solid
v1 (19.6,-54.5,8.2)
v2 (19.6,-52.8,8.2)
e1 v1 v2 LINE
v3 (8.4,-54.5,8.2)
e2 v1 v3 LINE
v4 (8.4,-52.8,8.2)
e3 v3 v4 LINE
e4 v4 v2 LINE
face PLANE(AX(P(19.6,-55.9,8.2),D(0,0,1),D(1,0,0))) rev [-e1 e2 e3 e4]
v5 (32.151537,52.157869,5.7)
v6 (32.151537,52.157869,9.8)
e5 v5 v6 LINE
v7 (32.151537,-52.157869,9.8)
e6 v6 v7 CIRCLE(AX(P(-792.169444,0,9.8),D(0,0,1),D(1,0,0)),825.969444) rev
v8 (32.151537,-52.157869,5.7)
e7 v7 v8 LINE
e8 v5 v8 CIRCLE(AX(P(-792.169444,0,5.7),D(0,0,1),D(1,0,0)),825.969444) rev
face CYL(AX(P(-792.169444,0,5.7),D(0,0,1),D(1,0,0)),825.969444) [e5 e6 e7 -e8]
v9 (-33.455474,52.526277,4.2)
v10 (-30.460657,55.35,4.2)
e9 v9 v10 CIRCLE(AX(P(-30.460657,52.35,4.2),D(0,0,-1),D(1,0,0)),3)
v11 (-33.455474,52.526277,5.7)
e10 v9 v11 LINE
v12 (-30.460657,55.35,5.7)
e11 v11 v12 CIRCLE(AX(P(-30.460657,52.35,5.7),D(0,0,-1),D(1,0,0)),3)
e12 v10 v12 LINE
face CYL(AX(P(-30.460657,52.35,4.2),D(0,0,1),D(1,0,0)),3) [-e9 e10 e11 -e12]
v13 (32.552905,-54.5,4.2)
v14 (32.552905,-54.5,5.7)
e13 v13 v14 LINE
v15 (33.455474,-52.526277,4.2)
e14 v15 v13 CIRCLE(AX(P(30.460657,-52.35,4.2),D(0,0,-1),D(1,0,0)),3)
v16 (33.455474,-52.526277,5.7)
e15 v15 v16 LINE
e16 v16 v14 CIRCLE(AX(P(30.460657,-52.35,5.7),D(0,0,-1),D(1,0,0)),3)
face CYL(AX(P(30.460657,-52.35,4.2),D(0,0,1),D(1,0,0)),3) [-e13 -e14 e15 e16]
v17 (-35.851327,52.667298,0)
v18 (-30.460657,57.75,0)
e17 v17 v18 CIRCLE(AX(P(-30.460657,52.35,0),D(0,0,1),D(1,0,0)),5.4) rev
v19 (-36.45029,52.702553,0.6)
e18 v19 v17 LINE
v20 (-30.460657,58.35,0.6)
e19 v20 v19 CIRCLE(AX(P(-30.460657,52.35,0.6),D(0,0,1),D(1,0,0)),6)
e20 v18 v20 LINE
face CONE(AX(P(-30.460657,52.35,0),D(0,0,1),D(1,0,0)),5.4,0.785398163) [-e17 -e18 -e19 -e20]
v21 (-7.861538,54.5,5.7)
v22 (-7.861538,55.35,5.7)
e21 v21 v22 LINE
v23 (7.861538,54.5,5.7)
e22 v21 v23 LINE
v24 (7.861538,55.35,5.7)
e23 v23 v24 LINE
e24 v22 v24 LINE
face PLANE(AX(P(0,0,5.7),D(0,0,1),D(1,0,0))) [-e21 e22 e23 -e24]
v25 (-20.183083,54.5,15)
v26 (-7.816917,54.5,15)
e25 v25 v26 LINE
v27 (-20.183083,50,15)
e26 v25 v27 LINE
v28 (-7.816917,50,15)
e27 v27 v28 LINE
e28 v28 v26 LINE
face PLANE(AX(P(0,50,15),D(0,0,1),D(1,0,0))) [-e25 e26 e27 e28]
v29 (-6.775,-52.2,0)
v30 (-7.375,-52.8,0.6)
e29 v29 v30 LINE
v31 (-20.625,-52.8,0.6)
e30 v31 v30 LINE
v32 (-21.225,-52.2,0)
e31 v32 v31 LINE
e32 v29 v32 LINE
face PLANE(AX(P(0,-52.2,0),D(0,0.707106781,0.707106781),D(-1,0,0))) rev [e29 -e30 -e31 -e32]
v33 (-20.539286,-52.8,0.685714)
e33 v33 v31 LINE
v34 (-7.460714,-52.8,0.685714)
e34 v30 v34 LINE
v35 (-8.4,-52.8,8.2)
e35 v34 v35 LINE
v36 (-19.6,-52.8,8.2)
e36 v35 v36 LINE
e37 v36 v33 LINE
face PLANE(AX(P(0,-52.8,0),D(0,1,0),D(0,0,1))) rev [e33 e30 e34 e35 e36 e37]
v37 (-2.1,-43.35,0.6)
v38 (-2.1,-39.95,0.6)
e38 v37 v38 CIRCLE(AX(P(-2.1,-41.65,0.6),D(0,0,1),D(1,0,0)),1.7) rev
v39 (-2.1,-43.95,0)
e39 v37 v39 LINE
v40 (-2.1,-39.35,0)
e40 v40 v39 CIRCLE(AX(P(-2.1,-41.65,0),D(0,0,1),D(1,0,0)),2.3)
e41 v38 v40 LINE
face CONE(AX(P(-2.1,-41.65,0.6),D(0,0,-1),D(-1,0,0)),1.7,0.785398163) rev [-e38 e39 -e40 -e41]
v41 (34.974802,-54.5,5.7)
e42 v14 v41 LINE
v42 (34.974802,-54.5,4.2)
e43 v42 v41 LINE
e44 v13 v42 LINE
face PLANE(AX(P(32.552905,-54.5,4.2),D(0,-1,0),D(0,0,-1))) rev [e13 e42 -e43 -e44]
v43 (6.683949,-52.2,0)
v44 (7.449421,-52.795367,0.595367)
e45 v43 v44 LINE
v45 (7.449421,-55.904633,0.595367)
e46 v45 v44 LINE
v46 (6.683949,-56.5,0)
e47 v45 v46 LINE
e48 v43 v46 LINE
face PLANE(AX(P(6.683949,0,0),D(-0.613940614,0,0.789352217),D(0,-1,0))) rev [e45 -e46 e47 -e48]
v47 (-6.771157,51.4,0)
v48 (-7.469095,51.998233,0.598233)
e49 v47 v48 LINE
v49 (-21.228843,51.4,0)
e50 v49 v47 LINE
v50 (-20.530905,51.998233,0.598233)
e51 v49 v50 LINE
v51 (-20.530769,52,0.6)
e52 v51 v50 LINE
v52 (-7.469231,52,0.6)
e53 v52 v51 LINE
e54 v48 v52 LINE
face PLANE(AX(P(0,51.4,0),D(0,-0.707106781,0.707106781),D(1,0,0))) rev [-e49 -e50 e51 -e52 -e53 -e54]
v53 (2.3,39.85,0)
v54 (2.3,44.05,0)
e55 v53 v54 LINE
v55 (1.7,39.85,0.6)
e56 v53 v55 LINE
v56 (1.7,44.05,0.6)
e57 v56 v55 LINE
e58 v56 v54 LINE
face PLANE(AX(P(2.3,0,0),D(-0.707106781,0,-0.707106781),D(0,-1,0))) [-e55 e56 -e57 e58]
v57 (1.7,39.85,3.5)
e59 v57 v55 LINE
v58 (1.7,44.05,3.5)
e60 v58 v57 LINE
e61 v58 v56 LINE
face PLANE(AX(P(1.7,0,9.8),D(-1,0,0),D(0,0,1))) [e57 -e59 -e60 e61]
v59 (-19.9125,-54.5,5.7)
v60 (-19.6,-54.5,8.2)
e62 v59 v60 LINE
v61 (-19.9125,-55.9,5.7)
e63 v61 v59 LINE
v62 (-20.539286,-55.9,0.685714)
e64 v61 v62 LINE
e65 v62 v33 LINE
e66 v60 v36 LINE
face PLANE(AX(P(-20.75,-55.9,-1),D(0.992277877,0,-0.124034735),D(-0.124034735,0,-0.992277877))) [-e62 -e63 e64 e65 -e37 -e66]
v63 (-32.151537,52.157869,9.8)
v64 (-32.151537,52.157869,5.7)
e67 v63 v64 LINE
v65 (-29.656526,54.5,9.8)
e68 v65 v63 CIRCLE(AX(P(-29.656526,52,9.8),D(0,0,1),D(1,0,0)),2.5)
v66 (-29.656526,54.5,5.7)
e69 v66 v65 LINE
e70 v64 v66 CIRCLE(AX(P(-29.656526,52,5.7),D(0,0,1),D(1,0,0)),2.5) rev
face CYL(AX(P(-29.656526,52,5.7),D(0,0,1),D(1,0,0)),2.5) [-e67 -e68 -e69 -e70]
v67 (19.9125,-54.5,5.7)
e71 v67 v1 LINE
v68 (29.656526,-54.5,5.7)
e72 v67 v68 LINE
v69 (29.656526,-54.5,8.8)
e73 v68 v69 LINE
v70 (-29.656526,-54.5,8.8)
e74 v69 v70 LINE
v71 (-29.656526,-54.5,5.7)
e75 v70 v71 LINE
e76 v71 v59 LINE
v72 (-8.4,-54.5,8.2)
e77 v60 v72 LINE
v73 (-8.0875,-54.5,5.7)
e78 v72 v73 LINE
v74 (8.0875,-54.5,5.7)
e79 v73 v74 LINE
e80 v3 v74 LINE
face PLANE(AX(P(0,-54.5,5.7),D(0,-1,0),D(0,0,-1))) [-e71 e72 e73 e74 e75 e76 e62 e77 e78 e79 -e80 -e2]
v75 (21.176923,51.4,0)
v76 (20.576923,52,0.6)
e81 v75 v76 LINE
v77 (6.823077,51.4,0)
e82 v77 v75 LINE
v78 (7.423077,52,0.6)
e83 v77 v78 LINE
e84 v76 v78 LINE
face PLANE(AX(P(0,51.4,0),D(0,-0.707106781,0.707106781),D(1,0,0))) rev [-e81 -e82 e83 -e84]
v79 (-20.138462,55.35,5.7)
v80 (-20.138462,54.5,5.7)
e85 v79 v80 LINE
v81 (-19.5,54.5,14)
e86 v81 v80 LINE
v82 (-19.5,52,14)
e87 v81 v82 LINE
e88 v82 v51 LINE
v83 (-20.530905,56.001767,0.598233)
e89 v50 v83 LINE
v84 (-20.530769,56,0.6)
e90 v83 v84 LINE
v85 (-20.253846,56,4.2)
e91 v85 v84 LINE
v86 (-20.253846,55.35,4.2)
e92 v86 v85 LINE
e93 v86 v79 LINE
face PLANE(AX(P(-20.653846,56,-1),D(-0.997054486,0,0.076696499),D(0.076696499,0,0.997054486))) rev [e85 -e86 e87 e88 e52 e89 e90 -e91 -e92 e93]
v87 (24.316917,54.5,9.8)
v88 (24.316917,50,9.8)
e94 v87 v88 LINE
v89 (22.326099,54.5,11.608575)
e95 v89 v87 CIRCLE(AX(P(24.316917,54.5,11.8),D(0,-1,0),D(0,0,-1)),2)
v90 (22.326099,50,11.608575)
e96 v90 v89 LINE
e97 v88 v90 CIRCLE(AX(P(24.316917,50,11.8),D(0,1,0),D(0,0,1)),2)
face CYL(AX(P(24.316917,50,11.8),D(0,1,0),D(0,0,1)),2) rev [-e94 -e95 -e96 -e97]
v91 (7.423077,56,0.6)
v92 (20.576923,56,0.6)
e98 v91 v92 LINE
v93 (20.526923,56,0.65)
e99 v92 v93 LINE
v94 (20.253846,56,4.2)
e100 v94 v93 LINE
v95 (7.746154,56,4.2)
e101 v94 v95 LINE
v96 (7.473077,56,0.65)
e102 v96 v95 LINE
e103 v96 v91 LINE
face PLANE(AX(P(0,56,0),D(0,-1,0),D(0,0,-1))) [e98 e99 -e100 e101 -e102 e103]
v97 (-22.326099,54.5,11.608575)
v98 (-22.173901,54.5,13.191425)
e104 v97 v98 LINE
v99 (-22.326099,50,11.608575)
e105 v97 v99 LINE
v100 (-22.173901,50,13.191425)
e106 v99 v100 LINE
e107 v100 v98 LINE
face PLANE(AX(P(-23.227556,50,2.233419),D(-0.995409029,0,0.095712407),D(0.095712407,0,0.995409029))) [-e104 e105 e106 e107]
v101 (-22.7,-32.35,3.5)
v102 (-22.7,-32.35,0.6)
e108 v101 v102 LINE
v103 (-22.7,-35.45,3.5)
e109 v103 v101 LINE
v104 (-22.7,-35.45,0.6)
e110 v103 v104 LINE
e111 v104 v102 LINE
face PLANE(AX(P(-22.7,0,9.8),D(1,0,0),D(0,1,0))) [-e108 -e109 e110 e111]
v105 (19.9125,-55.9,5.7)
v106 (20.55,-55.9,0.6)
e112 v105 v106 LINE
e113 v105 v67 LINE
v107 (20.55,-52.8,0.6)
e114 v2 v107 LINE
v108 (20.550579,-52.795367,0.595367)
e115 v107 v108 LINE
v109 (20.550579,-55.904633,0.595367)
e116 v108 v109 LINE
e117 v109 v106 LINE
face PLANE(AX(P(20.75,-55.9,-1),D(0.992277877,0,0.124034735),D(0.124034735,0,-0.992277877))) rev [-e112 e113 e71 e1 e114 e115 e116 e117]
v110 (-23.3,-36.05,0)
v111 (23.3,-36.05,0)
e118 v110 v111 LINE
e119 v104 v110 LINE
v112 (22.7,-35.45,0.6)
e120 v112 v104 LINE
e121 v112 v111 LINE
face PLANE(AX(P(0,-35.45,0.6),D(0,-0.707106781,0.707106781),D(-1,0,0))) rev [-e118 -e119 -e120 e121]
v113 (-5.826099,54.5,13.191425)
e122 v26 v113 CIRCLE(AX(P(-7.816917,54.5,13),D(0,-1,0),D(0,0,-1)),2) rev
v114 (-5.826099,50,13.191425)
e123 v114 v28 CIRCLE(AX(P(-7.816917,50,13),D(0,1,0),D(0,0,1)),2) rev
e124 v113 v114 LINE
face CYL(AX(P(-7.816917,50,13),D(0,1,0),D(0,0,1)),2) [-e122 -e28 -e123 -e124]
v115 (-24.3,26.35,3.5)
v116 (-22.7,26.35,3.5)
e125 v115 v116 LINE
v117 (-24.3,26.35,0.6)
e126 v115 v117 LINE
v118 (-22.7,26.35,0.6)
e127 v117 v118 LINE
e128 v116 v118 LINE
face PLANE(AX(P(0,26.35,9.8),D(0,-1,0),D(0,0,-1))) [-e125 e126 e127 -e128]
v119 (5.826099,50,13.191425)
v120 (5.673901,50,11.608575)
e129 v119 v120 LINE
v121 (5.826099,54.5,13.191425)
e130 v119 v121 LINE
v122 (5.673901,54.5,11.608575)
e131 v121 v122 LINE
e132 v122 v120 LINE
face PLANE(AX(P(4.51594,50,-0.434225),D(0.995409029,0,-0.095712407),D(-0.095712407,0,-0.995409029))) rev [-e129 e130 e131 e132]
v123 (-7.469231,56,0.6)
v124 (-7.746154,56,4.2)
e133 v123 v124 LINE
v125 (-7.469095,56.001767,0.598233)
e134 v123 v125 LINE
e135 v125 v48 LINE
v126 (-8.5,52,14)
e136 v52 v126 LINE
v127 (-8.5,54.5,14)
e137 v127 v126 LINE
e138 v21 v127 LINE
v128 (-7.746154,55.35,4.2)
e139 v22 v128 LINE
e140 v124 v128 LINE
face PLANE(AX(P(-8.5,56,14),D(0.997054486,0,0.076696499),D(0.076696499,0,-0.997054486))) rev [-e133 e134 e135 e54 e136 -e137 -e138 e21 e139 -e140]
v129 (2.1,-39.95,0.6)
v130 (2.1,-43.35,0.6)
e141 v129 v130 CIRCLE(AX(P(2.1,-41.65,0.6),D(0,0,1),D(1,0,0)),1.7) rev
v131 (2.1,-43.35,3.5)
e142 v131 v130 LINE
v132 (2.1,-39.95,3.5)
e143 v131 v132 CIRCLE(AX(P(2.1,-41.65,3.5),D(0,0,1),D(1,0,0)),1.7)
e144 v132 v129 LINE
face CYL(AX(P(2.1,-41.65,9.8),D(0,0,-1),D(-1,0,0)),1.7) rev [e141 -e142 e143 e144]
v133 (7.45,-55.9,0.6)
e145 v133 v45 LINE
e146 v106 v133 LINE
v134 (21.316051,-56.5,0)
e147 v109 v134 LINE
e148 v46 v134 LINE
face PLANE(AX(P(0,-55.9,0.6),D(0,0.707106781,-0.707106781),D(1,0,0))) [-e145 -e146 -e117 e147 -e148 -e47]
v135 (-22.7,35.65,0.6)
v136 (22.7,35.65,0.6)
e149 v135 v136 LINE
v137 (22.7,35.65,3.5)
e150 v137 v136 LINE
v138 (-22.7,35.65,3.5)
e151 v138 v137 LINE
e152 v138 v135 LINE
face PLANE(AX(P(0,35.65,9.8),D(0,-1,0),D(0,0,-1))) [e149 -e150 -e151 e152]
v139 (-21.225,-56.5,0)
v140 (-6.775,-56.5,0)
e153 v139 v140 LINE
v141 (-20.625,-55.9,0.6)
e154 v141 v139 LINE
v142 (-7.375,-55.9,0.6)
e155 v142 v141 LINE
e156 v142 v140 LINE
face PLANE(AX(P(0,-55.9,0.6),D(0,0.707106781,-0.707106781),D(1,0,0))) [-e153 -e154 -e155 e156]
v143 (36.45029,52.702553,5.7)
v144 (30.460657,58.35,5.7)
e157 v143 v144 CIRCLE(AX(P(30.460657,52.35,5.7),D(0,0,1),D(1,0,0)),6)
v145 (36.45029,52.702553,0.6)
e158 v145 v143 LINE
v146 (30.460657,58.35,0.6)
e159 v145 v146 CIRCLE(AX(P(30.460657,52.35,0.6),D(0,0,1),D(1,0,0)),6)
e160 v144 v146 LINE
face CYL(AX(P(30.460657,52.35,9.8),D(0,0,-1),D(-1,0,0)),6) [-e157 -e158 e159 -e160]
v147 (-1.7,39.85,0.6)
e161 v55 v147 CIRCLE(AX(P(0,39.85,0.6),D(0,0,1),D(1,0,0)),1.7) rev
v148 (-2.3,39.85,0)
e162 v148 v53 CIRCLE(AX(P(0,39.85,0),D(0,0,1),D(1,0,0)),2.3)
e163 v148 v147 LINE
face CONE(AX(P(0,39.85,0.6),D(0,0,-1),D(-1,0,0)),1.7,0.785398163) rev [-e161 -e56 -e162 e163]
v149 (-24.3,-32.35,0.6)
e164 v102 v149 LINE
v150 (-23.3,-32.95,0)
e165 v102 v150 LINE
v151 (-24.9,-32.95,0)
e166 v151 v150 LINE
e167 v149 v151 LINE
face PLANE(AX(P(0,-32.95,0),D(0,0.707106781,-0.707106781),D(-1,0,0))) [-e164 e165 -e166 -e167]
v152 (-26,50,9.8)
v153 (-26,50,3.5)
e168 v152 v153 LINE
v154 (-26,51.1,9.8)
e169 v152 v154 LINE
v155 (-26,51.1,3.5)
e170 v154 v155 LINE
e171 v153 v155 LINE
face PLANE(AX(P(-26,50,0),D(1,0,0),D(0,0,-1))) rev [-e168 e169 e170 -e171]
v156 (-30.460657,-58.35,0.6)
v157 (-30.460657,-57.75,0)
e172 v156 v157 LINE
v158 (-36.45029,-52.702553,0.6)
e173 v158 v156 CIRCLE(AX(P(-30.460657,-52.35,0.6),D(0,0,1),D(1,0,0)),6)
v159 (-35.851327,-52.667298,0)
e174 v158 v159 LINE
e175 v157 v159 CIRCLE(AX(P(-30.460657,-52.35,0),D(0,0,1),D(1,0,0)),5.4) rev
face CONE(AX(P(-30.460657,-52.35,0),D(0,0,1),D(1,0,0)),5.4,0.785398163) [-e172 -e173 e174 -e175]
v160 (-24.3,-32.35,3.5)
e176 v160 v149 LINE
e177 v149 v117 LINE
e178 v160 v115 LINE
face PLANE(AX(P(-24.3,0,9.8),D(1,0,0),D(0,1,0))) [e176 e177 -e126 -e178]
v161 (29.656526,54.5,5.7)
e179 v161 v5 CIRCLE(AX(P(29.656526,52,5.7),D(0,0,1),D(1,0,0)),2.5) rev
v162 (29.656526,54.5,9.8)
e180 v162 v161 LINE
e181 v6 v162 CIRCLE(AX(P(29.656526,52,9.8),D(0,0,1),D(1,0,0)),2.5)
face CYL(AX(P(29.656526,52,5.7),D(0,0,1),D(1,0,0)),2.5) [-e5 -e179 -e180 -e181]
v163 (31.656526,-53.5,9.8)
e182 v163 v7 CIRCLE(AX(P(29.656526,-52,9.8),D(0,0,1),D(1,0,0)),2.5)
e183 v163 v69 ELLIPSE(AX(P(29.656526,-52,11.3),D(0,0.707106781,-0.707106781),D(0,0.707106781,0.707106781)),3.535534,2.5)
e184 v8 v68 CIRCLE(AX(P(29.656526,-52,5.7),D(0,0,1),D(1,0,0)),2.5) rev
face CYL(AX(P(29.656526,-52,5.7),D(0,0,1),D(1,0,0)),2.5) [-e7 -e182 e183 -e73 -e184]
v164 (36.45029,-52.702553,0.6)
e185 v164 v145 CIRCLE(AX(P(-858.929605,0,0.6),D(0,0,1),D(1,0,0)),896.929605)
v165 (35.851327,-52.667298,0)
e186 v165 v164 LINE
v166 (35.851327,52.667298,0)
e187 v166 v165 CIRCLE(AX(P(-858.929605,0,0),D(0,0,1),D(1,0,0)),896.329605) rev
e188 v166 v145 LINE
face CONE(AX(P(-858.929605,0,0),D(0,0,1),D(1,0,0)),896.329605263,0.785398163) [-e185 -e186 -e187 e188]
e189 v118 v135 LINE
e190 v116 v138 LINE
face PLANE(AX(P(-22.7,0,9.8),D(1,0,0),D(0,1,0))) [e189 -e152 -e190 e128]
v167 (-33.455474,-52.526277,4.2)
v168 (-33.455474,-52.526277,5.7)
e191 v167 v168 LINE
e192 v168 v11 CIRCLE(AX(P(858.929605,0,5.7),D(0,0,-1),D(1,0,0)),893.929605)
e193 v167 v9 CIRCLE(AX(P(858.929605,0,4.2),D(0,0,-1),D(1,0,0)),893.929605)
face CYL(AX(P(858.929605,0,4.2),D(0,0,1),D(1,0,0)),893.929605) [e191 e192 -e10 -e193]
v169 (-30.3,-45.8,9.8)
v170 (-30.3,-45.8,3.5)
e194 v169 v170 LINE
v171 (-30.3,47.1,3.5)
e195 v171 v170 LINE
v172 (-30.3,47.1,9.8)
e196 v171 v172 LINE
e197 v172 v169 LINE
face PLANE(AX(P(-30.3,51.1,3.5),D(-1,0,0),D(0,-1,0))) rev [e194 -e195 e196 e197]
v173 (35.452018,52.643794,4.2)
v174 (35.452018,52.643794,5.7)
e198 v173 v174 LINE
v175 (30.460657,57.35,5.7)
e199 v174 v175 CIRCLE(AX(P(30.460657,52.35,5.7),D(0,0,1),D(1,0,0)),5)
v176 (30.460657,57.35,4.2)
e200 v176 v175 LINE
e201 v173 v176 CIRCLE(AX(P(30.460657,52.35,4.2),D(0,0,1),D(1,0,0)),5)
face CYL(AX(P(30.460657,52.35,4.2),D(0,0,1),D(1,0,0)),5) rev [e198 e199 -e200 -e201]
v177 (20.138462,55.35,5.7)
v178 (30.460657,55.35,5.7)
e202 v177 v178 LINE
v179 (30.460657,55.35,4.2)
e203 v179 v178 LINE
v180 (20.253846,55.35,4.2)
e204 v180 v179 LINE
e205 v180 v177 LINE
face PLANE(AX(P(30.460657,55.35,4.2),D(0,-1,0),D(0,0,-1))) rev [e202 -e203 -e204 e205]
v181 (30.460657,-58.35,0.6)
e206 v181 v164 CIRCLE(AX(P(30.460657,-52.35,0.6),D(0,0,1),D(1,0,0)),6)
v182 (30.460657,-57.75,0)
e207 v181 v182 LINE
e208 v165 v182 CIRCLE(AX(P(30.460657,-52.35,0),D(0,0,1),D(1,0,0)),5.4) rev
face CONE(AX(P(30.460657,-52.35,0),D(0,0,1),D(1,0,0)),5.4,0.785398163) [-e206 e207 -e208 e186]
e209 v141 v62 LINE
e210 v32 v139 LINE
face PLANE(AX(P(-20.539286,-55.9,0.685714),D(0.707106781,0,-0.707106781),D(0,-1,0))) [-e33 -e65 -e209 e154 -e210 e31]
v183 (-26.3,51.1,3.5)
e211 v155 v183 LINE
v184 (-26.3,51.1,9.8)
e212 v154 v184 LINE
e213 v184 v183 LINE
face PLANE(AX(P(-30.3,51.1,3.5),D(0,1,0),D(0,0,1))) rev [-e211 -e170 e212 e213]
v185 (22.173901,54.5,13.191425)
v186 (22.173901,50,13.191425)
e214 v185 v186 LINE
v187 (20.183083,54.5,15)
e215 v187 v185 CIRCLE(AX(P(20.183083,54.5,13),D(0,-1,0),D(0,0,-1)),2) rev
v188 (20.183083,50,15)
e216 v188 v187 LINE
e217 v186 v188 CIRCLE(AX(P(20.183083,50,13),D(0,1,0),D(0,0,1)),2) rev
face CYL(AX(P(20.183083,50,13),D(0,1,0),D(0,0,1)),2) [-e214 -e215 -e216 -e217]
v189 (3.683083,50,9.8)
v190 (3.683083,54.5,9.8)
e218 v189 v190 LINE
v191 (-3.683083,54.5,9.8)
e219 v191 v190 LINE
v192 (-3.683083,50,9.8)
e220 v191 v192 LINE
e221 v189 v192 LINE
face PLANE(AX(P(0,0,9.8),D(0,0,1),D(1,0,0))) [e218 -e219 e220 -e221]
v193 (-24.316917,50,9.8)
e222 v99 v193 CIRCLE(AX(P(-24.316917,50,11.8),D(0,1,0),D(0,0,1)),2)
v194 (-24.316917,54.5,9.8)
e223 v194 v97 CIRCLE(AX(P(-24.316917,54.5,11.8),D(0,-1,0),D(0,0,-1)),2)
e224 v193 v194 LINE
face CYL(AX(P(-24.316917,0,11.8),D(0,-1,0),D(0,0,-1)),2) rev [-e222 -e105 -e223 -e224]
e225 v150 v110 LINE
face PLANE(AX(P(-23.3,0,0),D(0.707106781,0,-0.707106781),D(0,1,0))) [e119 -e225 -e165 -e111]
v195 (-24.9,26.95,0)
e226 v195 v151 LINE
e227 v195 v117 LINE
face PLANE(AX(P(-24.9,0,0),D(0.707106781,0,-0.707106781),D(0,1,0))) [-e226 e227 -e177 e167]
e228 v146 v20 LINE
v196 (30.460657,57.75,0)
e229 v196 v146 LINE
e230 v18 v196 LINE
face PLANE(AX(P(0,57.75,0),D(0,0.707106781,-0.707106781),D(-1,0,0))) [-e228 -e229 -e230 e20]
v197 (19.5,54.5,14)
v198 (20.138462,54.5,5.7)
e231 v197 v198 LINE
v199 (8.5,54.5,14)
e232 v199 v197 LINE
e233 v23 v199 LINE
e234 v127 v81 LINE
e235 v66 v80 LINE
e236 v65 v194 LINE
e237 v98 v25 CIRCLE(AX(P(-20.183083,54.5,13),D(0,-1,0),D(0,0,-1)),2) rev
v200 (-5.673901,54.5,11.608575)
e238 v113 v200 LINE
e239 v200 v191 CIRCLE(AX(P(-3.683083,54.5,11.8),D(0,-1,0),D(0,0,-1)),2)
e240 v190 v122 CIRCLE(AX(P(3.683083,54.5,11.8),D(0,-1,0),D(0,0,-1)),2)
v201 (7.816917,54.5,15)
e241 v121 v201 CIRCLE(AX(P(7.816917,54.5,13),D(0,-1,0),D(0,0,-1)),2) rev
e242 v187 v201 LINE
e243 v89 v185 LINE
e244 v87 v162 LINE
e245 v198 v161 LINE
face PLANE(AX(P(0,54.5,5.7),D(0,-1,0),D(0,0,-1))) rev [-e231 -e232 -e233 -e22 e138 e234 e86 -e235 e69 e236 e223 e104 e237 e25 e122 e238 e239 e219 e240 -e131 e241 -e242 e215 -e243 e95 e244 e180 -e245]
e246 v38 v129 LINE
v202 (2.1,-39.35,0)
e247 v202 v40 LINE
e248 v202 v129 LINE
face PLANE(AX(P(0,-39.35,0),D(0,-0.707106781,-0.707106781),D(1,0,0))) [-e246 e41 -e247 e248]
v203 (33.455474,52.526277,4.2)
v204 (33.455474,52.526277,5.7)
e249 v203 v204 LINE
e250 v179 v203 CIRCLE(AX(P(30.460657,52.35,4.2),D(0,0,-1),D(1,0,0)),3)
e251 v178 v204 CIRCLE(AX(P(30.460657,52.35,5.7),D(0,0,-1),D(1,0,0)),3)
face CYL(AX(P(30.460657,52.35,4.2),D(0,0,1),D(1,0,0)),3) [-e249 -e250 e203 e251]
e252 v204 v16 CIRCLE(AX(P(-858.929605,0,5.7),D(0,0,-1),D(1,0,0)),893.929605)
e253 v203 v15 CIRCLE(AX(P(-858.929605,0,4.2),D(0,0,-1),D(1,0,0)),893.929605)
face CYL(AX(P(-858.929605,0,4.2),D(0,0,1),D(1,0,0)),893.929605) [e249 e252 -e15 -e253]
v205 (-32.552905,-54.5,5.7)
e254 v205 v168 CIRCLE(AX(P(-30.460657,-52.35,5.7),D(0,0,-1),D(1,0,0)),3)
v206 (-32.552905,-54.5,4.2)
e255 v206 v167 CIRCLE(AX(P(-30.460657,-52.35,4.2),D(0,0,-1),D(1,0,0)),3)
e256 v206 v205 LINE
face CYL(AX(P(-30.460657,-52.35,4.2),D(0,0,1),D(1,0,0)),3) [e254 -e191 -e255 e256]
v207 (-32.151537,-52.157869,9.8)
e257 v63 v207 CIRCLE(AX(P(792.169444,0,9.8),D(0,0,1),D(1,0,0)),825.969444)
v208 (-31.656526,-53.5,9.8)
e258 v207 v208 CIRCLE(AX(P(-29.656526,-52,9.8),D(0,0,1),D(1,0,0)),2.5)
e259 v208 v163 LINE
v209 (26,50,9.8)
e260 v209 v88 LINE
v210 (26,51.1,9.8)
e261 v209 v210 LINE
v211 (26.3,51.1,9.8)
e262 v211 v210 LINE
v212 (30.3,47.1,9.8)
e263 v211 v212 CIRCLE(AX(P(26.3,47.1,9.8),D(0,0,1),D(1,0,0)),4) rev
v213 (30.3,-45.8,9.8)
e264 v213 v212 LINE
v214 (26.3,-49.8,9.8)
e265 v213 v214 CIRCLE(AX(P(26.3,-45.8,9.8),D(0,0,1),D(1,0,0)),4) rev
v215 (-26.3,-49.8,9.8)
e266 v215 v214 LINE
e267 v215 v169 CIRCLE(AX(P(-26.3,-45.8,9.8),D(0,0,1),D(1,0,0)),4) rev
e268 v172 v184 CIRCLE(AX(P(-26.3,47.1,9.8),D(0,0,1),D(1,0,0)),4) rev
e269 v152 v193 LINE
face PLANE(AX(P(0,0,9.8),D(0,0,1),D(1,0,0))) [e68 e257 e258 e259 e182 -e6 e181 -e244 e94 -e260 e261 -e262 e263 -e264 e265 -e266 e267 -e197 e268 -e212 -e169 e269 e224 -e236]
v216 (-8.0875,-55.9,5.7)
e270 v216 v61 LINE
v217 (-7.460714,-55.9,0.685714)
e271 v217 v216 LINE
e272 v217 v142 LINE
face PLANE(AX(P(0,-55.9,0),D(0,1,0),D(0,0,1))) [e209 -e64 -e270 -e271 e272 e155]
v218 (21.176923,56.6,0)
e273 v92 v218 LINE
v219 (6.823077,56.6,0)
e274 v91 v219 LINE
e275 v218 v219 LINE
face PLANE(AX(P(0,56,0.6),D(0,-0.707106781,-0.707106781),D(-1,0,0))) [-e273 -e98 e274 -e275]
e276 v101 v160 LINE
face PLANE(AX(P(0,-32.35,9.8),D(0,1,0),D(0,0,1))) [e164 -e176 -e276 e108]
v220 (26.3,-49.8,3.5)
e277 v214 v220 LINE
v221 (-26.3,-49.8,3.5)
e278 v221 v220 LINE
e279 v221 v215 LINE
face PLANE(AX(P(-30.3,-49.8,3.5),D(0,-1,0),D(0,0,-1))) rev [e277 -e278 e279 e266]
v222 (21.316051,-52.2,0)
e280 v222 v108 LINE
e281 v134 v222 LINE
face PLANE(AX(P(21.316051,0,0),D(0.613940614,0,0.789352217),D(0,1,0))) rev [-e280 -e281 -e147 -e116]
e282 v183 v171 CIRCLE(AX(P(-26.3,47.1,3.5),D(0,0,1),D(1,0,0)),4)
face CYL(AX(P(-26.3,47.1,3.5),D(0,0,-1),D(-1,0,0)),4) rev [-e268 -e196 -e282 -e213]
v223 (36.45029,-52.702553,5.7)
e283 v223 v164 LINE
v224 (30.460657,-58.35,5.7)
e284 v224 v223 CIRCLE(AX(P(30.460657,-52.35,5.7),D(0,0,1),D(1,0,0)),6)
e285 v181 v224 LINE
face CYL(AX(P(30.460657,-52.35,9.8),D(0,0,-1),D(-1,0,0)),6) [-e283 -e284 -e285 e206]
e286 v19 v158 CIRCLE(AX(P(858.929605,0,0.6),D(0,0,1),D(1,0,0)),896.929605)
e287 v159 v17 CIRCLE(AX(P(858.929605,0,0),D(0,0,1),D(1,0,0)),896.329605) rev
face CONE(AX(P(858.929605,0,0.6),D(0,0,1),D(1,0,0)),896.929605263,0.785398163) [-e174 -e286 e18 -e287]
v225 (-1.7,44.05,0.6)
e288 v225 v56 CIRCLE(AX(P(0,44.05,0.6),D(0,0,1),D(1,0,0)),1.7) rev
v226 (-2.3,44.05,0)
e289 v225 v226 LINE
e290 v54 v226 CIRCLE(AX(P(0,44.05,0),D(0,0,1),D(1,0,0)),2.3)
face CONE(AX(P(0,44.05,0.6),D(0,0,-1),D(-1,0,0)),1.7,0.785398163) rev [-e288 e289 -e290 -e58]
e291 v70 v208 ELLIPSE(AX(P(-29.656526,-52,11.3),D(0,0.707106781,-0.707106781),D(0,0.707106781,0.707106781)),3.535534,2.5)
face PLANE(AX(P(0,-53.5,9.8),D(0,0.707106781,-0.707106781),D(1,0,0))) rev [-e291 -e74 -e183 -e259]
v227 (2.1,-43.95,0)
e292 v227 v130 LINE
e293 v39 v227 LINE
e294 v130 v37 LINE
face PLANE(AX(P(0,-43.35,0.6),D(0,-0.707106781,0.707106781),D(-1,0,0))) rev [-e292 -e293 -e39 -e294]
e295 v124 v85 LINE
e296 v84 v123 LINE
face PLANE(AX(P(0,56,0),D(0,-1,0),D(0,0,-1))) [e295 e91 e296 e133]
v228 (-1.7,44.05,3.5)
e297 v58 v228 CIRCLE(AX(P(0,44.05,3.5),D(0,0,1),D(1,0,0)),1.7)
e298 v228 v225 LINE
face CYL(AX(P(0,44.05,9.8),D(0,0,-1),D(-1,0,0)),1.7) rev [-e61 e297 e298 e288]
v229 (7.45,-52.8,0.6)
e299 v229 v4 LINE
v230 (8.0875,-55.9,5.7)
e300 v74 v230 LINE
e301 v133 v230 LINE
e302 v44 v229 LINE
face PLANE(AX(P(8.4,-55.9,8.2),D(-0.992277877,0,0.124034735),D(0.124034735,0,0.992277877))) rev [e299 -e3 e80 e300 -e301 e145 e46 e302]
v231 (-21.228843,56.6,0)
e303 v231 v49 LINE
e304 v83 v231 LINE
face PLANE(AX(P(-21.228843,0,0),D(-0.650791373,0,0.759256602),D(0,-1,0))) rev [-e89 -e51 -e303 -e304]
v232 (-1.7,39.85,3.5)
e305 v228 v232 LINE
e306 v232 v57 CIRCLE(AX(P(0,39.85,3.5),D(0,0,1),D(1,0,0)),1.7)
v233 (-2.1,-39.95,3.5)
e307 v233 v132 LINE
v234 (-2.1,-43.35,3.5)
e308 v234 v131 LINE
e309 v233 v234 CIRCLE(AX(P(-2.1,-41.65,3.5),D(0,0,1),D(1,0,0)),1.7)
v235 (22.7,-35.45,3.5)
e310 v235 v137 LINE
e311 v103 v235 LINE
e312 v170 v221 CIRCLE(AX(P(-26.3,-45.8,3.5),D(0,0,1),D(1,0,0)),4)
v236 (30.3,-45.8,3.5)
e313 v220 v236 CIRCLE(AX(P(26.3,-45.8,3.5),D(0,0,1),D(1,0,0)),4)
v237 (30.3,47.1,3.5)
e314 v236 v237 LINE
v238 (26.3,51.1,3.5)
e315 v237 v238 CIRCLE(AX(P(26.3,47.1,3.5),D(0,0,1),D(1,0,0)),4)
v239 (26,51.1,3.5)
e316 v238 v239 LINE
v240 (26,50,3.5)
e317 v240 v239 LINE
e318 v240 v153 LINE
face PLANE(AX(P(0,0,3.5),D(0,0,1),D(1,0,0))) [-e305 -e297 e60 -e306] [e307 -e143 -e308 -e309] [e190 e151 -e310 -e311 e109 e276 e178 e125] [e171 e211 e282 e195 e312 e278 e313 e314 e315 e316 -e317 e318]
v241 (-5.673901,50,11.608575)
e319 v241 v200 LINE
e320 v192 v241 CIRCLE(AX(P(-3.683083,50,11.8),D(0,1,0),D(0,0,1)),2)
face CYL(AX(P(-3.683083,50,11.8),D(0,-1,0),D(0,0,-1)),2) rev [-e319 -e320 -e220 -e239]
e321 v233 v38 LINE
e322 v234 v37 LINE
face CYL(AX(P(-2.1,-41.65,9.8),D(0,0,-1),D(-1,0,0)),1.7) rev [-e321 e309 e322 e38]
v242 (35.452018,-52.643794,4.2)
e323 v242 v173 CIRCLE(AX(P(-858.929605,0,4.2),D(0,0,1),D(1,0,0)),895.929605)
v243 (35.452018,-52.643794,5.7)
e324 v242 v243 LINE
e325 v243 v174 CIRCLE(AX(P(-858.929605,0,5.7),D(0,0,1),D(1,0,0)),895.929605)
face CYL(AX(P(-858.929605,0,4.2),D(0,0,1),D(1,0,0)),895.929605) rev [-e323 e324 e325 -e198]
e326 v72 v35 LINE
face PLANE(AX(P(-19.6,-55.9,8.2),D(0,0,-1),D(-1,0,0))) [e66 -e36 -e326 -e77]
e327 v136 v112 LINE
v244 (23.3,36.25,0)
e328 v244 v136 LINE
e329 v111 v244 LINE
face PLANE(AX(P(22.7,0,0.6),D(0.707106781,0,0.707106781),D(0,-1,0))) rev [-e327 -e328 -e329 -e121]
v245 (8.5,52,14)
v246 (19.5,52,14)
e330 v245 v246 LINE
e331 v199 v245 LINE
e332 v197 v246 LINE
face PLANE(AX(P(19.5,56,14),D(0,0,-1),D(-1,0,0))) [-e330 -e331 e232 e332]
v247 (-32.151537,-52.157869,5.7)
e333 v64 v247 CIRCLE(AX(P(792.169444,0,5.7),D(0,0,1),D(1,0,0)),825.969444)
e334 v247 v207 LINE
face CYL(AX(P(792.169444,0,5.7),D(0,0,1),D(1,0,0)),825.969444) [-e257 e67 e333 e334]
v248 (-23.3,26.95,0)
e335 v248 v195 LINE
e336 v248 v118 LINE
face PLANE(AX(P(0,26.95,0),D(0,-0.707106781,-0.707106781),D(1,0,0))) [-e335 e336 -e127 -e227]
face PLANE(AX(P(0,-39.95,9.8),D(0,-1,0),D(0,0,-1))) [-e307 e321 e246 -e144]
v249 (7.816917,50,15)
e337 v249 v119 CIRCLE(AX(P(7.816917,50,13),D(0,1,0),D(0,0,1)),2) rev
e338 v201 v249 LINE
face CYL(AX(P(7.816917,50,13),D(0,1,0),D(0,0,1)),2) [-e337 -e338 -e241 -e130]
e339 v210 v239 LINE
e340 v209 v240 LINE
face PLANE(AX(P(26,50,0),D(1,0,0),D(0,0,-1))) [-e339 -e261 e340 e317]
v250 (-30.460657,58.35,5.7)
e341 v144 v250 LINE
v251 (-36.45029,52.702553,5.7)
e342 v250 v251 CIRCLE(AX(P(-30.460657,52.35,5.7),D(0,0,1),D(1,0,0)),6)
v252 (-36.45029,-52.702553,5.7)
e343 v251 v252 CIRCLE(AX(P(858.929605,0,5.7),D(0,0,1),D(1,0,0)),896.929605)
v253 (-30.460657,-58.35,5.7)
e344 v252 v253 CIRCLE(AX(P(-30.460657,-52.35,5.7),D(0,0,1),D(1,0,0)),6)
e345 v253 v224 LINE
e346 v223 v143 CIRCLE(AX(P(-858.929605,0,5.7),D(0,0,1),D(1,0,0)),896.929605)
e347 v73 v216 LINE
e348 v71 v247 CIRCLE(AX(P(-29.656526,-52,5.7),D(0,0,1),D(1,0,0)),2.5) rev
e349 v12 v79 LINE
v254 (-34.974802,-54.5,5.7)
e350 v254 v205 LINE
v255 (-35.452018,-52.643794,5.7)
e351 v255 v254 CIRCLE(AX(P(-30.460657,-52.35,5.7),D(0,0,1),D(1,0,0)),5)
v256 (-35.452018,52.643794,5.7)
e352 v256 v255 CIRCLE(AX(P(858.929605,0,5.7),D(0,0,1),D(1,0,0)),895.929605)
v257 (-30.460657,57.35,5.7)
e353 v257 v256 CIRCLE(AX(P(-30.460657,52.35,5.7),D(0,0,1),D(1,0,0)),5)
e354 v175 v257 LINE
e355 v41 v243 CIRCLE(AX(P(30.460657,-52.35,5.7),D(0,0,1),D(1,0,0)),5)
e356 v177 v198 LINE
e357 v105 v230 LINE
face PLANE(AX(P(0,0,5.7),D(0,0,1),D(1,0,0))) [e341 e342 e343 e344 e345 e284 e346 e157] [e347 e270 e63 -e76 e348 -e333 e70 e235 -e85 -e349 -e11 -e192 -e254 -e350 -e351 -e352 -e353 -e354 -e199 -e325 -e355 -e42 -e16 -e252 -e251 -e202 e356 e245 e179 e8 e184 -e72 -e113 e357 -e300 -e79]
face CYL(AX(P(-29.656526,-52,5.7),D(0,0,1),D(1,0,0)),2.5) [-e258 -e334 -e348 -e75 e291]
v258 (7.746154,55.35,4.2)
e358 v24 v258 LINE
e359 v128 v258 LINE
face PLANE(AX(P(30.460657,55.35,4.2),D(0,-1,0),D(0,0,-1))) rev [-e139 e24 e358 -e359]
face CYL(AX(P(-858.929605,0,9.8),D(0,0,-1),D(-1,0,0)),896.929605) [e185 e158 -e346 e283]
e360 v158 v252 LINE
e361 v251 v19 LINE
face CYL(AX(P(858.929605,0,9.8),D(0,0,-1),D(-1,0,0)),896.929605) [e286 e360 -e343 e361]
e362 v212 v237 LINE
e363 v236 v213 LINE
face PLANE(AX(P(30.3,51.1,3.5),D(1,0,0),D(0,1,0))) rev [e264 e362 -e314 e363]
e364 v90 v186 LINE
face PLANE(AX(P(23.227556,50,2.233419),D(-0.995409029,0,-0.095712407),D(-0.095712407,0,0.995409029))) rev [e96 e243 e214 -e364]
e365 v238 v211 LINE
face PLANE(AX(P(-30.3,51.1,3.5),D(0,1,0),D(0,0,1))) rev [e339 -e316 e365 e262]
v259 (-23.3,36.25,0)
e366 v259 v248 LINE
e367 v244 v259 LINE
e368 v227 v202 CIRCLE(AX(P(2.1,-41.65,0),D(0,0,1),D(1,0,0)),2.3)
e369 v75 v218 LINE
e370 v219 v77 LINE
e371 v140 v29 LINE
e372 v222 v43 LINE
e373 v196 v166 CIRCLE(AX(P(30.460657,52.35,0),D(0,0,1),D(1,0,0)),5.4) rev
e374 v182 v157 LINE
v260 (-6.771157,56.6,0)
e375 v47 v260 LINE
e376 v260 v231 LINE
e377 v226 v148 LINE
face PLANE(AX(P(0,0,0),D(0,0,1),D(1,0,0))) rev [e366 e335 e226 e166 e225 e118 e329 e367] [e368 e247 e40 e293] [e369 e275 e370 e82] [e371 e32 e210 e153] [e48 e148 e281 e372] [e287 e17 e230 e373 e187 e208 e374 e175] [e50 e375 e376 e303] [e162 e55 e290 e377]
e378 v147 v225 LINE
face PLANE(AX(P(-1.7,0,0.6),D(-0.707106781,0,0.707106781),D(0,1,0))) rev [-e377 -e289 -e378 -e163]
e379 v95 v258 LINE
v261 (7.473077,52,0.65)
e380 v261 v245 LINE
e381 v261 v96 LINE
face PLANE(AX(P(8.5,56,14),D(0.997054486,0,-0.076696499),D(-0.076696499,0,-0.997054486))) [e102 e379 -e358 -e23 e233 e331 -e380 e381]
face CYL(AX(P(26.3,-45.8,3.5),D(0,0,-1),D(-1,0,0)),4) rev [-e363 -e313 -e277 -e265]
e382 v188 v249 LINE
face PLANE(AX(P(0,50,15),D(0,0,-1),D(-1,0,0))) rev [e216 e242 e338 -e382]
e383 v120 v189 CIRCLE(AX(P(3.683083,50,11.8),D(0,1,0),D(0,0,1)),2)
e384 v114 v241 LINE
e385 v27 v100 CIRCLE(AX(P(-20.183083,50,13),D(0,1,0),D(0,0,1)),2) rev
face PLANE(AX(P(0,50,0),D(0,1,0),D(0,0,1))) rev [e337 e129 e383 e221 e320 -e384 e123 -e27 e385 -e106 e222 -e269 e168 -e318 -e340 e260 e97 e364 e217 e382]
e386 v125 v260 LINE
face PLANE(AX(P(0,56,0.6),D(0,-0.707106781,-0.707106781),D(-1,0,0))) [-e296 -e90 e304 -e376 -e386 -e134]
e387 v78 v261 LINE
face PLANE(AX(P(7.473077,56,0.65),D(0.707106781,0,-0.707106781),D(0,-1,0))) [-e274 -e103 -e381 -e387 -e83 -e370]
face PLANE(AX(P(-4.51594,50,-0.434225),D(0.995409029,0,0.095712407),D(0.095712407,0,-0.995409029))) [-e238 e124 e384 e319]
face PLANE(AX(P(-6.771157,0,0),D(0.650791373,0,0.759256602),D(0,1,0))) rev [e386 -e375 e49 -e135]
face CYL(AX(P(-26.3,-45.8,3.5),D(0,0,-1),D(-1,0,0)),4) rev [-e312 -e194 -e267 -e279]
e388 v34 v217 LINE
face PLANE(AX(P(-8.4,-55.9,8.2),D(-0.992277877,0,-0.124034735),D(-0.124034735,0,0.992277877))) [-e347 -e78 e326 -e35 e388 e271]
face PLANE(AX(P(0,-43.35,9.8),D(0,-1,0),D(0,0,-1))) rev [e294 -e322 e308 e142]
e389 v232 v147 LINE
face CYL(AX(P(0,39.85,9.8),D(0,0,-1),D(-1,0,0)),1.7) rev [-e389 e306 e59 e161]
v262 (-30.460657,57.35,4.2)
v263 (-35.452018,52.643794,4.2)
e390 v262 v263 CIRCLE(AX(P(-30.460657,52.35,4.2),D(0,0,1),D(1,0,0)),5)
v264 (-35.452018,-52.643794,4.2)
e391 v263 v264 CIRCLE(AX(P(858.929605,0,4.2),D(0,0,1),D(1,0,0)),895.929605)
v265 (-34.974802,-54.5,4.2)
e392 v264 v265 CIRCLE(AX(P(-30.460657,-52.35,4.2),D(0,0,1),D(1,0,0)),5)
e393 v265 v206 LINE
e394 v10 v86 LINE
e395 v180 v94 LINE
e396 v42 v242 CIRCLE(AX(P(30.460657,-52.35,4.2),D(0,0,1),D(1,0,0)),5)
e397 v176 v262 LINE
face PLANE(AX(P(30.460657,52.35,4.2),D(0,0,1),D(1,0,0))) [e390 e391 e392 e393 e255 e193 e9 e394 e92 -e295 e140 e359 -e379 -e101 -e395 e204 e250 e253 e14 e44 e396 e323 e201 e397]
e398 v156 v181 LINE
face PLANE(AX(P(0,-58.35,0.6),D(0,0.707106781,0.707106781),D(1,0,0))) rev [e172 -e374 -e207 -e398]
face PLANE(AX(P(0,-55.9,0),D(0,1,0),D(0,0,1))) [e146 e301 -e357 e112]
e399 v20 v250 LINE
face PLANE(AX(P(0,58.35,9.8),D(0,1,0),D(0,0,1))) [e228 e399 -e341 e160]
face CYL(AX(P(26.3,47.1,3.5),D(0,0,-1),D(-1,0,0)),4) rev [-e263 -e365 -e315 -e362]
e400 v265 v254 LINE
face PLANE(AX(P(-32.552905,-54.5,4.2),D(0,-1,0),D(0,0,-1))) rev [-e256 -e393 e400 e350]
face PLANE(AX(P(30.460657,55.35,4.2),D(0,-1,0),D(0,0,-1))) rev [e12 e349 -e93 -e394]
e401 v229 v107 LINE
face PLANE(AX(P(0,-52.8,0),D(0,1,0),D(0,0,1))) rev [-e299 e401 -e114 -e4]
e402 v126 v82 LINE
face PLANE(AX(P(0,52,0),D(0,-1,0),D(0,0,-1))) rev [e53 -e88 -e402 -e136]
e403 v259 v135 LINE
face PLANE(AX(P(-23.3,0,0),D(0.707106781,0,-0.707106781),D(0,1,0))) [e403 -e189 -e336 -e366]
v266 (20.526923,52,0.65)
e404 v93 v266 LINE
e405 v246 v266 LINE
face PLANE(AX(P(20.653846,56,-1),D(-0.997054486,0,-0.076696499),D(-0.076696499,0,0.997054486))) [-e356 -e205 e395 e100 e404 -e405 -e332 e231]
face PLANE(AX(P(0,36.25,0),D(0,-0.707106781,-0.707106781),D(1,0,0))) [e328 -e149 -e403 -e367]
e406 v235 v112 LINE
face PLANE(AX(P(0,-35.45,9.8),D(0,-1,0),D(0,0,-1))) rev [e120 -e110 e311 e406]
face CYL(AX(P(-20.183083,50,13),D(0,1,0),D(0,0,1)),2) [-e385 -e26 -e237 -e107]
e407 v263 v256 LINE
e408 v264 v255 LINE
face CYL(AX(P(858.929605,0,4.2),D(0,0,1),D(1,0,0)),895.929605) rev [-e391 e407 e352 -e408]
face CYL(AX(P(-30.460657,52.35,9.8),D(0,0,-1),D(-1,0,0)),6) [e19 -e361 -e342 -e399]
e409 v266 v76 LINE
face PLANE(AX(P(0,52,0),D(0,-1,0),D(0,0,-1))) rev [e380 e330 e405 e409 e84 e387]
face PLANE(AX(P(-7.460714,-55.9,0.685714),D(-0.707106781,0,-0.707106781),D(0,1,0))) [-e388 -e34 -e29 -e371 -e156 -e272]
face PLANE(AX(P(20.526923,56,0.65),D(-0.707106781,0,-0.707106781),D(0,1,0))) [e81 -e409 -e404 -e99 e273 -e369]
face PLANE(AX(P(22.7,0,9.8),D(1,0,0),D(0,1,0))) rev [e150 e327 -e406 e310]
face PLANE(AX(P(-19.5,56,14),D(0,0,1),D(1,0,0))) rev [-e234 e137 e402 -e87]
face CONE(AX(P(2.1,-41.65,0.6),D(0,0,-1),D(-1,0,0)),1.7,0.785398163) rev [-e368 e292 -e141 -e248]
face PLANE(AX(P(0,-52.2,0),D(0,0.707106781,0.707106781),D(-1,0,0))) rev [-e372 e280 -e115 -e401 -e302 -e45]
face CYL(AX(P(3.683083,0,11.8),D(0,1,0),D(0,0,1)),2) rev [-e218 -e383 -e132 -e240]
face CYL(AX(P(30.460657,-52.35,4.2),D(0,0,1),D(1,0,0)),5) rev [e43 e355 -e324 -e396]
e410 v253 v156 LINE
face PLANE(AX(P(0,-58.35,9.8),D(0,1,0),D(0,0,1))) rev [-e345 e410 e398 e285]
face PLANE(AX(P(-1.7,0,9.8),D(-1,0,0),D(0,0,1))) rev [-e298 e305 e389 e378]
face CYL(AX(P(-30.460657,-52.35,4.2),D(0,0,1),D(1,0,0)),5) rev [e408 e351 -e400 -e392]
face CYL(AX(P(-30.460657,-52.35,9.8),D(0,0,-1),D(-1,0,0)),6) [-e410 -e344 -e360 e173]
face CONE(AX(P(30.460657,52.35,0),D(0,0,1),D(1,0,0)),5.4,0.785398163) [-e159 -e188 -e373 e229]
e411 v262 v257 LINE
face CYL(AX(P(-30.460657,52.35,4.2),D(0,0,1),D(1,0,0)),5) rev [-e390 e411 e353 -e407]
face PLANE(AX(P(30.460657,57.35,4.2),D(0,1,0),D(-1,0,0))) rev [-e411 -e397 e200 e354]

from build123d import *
from OCP.BRepFilletAPI import BRepFilletAPI_MakeChamfer

# Parameters (mm, degrees)
BOSS_EXTRUDE1_DEPTH = 9.8
CUT_EXTRUDE1_START  = -4.1
CUT_EXTRUDE1_DEPTH  = 4.1
SKETCH3_W           = 60.6
SKETCH3_H           = 100.9
CUT_EXTRUDE2_DEPTH  = 6.3
SKETCH4_W           = 1.6
SKETCH4_H           = 58.7
SKETCH4_W_2         = 45.4
SKETCH4_H_2         = 71.1
CUT_EXTRUDE3_DEPTH  = 71.319005255
BOSS_EXTRUDE3_START = -4.5
BOSS_EXTRUDE3_DEPTH = 4.5
CUT_EXTRUDE4_START  = -2.5
CUT_EXTRUDE4_DEPTH  = 4
CUT_EXTRUDE5_START  = -1.7
CUT_EXTRUDE5_DEPTH  = 3.1
FILLET1_R           = 6
FILLET2_R           = 4
FILLET3_R           = 2.5
CUT_EXTRUDE6_DEPTH  = 1.5
CHAMFER1_SIZE       = 1
CHAMFER2_SIZE       = 0.6
CHAMFER2_SIZE2      = 0.651920241
CHAMFER2_SIZE2_2    = 0.691050664
FILLET4_R           = 2


# Read off the part's stored shape, not the designer's step: Boss-Extrude3
with BuildPart() as part:
    # Sketch1 → Boss-Extrude1 (new body)
    with BuildSketch(Plane.XY):
        with BuildLine():
            ThreePointArc((-38, 0), (-37.524874157, -29.190462912), (-36.1, -58.35))
            Line((-36.1, -58.35), (36.1, -58.35))
            ThreePointArc((36.1, -58.35), (37.524874157, -29.190462912), (38, 0))
            ThreePointArc((38, 0), (37.524874157, 29.190462912), (36.1, 58.35))
            Line((36.1, 58.35), (-36.1, 58.35))
            ThreePointArc((-36.1, 58.35), (-37.524874157, 29.190462912), (-38, 0))
        make_face()
    extrude(amount=BOSS_EXTRUDE1_DEPTH)

    # Sketch2 → Cut-Extrude1 (cut)
    with BuildSketch(Plane.XY.offset(9.8).offset(CUT_EXTRUDE1_START)):
        with BuildLine():
            ThreePointArc((36.1, -58.35), (38, 0), (36.1, 58.35))
            Line((36.1, 58.35), (-36.1, 58.35))
            ThreePointArc((-36.1, 58.35), (-38, 0), (-36.1, -58.35))
            Line((-36.1, -58.35), (36.1, -58.35))
        make_face()
        with BuildLine():
            Line((-32, 54.5), (32, 54.5))
            ThreePointArc((32, 54.5), (33.8, 0), (32, -54.5))
            Line((32, -54.5), (-32, -54.5))
            ThreePointArc((-32, -54.5), (-33.8, 0), (-32, 54.5))
        make_face(mode=Mode.SUBTRACT)
    extrude(amount=CUT_EXTRUDE1_DEPTH, mode=Mode.SUBTRACT)

    # Sketch3 → Cut-Extrude2 (cut)
    with BuildSketch(Plane.XY.offset(9.8)):
        with Locations((0, 0.65)):
            Rectangle(SKETCH3_W, SKETCH3_H)
    extrude(amount=-CUT_EXTRUDE2_DEPTH, mode=Mode.SUBTRACT)

    # Sketch4 → Cut-Extrude3 (cut, through all)
    with BuildSketch(Plane(origin=(0, 0, 0), x_dir=(-1, 0, 0), z_dir=(0, 0, -1))):
        with Locations((23.5, -3)):
            Rectangle(SKETCH4_W, SKETCH4_H)
        with Locations((0, 0.1)):
            Rectangle(SKETCH4_W_2, SKETCH4_H_2)
        with BuildLine():
            Line((-2.1, -43.35), (2.1, -43.35))
            ThreePointArc((2.1, -43.35), (3.8, -41.65), (2.1, -39.95))
            Line((2.1, -39.95), (-2.1, -39.95))
            ThreePointArc((-2.1, -39.95), (-3.8, -41.65), (-2.1, -43.35))
        make_face()
        with BuildLine():
            Line((1.7, 39.85), (1.7, 44.05))
            ThreePointArc((1.7, 44.05), (0, 45.75), (-1.7, 44.05))
            Line((-1.7, 44.05), (-1.7, 39.85))
            ThreePointArc((-1.7, 39.85), (0, 38.15), (1.7, 39.85))
        make_face()
    extrude(amount=-CUT_EXTRUDE3_DEPTH, mode=Mode.SUBTRACT)

    # Boss-Extrude3 outline → Boss-Extrude3 (add)
    with BuildSketch(Plane(origin=(0, 54.5, 0), x_dir=(1, 0, 0), z_dir=(0, 1, 0)).offset(BOSS_EXTRUDE3_START)):
        Polygon((0, -3.5), (0, -9.8), (5.5, -9.8), (6, -15), (22, -15), (22.5, -9.8), (26, -9.8), (26, -3.5), align=None)
    boss_extrude3 = extrude(amount=BOSS_EXTRUDE3_DEPTH)

    # Sketch7 → Cut-Extrude4 (cut)
    with BuildSketch(Plane(origin=(0, 54.5, 0), x_dir=(1, 0, 0), z_dir=(0, 1, 0)).offset(CUT_EXTRUDE4_START)):
        Polygon((19.5, -14), (8.5, -14), (7.346153846, 1), (20.653846154, 1), align=None)
    cut_extrude4 = extrude(amount=CUT_EXTRUDE4_DEPTH, mode=Mode.SUBTRACT)

    # Mirror3: Boss-Extrude3, Cut-Extrude4 across plane
    add(boss_extrude3.mirror(Plane(origin=(0, 0, 0), x_dir=(0, 0, 1), z_dir=(1, 0, 0))))
    add(cut_extrude4.mirror(Plane(origin=(0, 0, 0), x_dir=(0, 0, 1), z_dir=(1, 0, 0))), mode=Mode.SUBTRACT)

    # Sketch8 → Cut-Extrude5 (cut)
    with BuildSketch(Plane.XZ.offset(54.5).offset(CUT_EXTRUDE5_START)):
        Polygon((-20.75, -1), (-19.6, 8.2), (-8.4, 8.2), (-7.25, -1), align=None)
    cut_extrude5 = extrude(amount=CUT_EXTRUDE5_DEPTH, mode=Mode.SUBTRACT)

    # Mirror4: Cut-Extrude5 across plane
    add(cut_extrude5.mirror(Plane(origin=(0, 0, 0), x_dir=(0, 0, 1), z_dir=(1, 0, 0))), mode=Mode.SUBTRACT)

    # Fillet1
    fillet1_edges = [part.edges().sort_by_distance(p)[0] for p in [
        (36.1, 58.35, 2.85),
        (36.1, -58.35, 2.85),
        (-36.1, -58.35, 2.85),
        (-36.1, 58.35, 2.85),
    ]]
    fillet(fillet1_edges, radius=FILLET1_R)

    # Fillet2
    fillet2_edges = [part.edges().sort_by_distance(p)[0] for p in [
        (-30.3, -49.8, 6.65),
        (-30.3, 51.1, 6.65),
        (30.3, 51.1, 6.65),
        (30.3, -49.8, 6.65),
    ]]
    fillet(fillet2_edges, radius=FILLET2_R)

    # Fillet3
    fillet3_edges = [part.edges().sort_by_distance(p)[0] for p in [
        (32, 54.5, 7.75),
        (-32, 54.5, 7.75),
        (-32, -54.5, 7.75),
        (32, -54.5, 7.75),
    ]]
    fillet(fillet3_edges, radius=FILLET3_R)

    # Sketch10 → Cut-Extrude6 (cut)
    with BuildSketch(Plane.XY.offset(5.7)):
        with BuildLine():
            Line((30.460657239, 55.35), (-30.460657239, 55.35))
            ThreePointArc((-30.460657239, 55.35), (-32.518710973, 54.532753955), (-33.455473858, 52.526276553))
            ThreePointArc((-33.455473858, 52.526276553), (-35, 0), (-33.455473858, -52.526276553))
            ThreePointArc((-33.455473858, -52.526276553), (-33.188926222, -53.597617073), (-32.552904835, -54.5))
            Line((-32.552904835, -54.5), (-34.974801677, -54.5))
            ThreePointArc((-34.974801677, -54.5), (-35.303180702, -53.59497651), (-35.45201827, -52.643794255))
            ThreePointArc((-35.45201827, -52.643794255), (-37, 0), (-35.45201827, 52.643794255))
            ThreePointArc((-35.45201827, 52.643794255), (-33.890746795, 55.987923259), (-30.460657239, 57.35))
            Line((-30.460657239, 57.35), (30.460657239, 57.35))
            ThreePointArc((30.460657239, 57.35), (33.890746795, 55.987923259), (35.45201827, 52.643794255))
            ThreePointArc((35.45201827, 52.643794255), (37, 0), (35.45201827, -52.643794255))
            ThreePointArc((35.45201827, -52.643794255), (35.303180702, -53.59497651), (34.974801677, -54.5))
            Line((34.974801677, -54.5), (32.552904835, -54.5))
            ThreePointArc((32.552904835, -54.5), (33.188926222, -53.597617073), (33.455473858, -52.526276553))
            ThreePointArc((33.455473858, -52.526276553), (35, 0), (33.455473858, 52.526276553))
            ThreePointArc((33.455473858, 52.526276553), (32.518710973, 54.532753955), (30.460657239, 55.35))
        make_face()
    extrude(amount=-CUT_EXTRUDE6_DEPTH, mode=Mode.SUBTRACT)

    # Chamfer1
    # the kernel refuses this chamfer: 1 mm, written as the material it takes off along each edge
    with BuildSketch(Plane(origin=(32.228209132, -54.5, 9.8), x_dir=(0, 0.9996219169112968, 0.02749587661058555), z_dir=(-1, 0, 0))) as chamfer1_piece_1:
        Polygon((CHAMFER1_SIZE * 0.999621916911, CHAMFER1_SIZE * 0.0274958766106), (-CHAMFER1_SIZE * 0.0274958766106, CHAMFER1_SIZE * 0.999621916911), (0, 0), align=None)
    extrude(amount=64.456418264, mode=Mode.SUBTRACT)

    # Chamfer2: one chamfer whose edges measure the first distance from different faces: ONE call of the kernel's chamfer builder (chamfer() names one face for all edges)
    chamfer2_edges_1 = [part.edges().sort_by_distance(p)[0] for p in [
        (14, 52, 0),
        (14, 56, 0),
        (-14, 52, 0),
        (-14, 56, 0),
        (-14, -52.8, 0),
        (-14, -55.9, 0),
        (14, -52.8, 0),
        (14, -55.9, 0),
        (0, -58.35, 0),
        (0, 58.35, 0),
        (38, 0, 0),
        (-38, 0, 0),
        (34.576764706, 56.715507911, 0),
        (-34.576764706, 56.715507911, 0),
        (34.576764706, -56.715507911, 0),
        (-34.576764706, -56.715507911, 0),
        (1.7, 41.95, 0),
        (-1.7, 41.95, 0),
        (0, 45.75, 0),
        (0, 38.15, 0),
        (0, -39.95, 0),
        (0, -43.35, 0),
        (-3.8, -41.65, 0),
        (3.8, -41.65, 0),
        (-23.5, -32.35, 0),
        (-22.7, -33.9, 0),
        (0, 35.65, 0),
        (-22.7, 31, 0),
        (-23.5, 26.35, 0),
        (-24.3, -3, 0),
        (22.7, 0.1, 0),
        (0, -35.45, 0),
    ]]
    chamfer2_edges_2 = [part.edges().sort_by_distance(p)[0] for p in [
        (20.576923077, 54, 0),
        (7.423076923, 54, 0),
    ]]
    chamfer2_side_2 = [part.faces().sort_by_distance(p)[0] for p in [
        (0, -56.957344623, 0),
    ]]
    chamfer2_edges_3 = [part.edges().sort_by_distance(p)[0] for p in [
        (-20.576923077, 54, 0),
    ]]
    chamfer2_side_3 = [part.faces().sort_by_distance(p)[0] for p in [
        (-20.098958851, 53.596109806, 6.213534938),
    ]]
    chamfer2_edges_4 = [part.edges().sort_by_distance(p)[0] for p in [
        (-7.423076923, 54, 0),
    ]]
    chamfer2_side_4 = [part.faces().sort_by_distance(p)[0] for p in [
        (-7.901041149, 53.596109806, 6.213534938),
    ]]
    chamfer2_edges_5 = [part.edges().sort_by_distance(p)[0] for p in [
        (-7.375, -54.35, 0),
        (-20.625, -54.35, 0),
    ]]
    chamfer2_side_5 = [part.faces().sort_by_distance(p)[0] for p in [
        (0, -56.957344623, 0),
    ]]
    chamfer2_edges_6 = [part.edges().sort_by_distance(p)[0] for p in [
        (20.625, -54.35, 0),
    ]]
    chamfer2_side_6 = [part.faces().sort_by_distance(p)[0] for p in [
        (20.169382984, -54.214279197, 3.644936131),
    ]]
    chamfer2_edges_7 = [part.edges().sort_by_distance(p)[0] for p in [
        (7.375, -54.35, 0),
    ]]
    chamfer2_side_7 = [part.faces().sort_by_distance(p)[0] for p in [
        (7.830617016, -54.214279197, 3.644936131),
    ]]
    chamfer2 = BRepFilletAPI_MakeChamfer(part.part.solid().wrapped)
    for e in chamfer2_edges_1:
        chamfer2.Add(CHAMFER2_SIZE, e.wrapped)
    for e in chamfer2_edges_2:
        chamfer2.Add(CHAMFER2_SIZE, CHAMFER2_SIZE2, e.wrapped, chamfer2_side_2[0].wrapped)  # the first distance lies on this face
    for e in chamfer2_edges_3:
        chamfer2.Add(CHAMFER2_SIZE, CHAMFER2_SIZE2, e.wrapped, chamfer2_side_3[0].wrapped)  # the first distance lies on this face
    for e in chamfer2_edges_4:
        chamfer2.Add(CHAMFER2_SIZE, CHAMFER2_SIZE2, e.wrapped, chamfer2_side_4[0].wrapped)  # the first distance lies on this face
    for e in chamfer2_edges_5:
        chamfer2.Add(CHAMFER2_SIZE, CHAMFER2_SIZE2_2, e.wrapped, chamfer2_side_5[0].wrapped)  # the first distance lies on this face
    for e in chamfer2_edges_6:
        chamfer2.Add(CHAMFER2_SIZE, CHAMFER2_SIZE2_2, e.wrapped, chamfer2_side_6[0].wrapped)  # the first distance lies on this face
    for e in chamfer2_edges_7:
        chamfer2.Add(CHAMFER2_SIZE, CHAMFER2_SIZE2_2, e.wrapped, chamfer2_side_7[0].wrapped)  # the first distance lies on this face
    add(Compound.cast(chamfer2.Shape()), mode=Mode.REPLACE)

    # Fillet4
    fillet4_edges = [part.edges().sort_by_distance(p)[0] for p in [
        (5.5, 52.25, 9.8),
        (22.5, 52.25, 9.8),
        (22, 52.25, 15),
        (6, 52.25, 15),
        (-22.5, 52.25, 9.8),
        (-5.5, 52.25, 9.8),
        (-6, 52.25, 15),
        (-22, 52.25, 15),
    ]]
    fillet(fillet4_edges, radius=FILLET4_R)


solid = part.part
